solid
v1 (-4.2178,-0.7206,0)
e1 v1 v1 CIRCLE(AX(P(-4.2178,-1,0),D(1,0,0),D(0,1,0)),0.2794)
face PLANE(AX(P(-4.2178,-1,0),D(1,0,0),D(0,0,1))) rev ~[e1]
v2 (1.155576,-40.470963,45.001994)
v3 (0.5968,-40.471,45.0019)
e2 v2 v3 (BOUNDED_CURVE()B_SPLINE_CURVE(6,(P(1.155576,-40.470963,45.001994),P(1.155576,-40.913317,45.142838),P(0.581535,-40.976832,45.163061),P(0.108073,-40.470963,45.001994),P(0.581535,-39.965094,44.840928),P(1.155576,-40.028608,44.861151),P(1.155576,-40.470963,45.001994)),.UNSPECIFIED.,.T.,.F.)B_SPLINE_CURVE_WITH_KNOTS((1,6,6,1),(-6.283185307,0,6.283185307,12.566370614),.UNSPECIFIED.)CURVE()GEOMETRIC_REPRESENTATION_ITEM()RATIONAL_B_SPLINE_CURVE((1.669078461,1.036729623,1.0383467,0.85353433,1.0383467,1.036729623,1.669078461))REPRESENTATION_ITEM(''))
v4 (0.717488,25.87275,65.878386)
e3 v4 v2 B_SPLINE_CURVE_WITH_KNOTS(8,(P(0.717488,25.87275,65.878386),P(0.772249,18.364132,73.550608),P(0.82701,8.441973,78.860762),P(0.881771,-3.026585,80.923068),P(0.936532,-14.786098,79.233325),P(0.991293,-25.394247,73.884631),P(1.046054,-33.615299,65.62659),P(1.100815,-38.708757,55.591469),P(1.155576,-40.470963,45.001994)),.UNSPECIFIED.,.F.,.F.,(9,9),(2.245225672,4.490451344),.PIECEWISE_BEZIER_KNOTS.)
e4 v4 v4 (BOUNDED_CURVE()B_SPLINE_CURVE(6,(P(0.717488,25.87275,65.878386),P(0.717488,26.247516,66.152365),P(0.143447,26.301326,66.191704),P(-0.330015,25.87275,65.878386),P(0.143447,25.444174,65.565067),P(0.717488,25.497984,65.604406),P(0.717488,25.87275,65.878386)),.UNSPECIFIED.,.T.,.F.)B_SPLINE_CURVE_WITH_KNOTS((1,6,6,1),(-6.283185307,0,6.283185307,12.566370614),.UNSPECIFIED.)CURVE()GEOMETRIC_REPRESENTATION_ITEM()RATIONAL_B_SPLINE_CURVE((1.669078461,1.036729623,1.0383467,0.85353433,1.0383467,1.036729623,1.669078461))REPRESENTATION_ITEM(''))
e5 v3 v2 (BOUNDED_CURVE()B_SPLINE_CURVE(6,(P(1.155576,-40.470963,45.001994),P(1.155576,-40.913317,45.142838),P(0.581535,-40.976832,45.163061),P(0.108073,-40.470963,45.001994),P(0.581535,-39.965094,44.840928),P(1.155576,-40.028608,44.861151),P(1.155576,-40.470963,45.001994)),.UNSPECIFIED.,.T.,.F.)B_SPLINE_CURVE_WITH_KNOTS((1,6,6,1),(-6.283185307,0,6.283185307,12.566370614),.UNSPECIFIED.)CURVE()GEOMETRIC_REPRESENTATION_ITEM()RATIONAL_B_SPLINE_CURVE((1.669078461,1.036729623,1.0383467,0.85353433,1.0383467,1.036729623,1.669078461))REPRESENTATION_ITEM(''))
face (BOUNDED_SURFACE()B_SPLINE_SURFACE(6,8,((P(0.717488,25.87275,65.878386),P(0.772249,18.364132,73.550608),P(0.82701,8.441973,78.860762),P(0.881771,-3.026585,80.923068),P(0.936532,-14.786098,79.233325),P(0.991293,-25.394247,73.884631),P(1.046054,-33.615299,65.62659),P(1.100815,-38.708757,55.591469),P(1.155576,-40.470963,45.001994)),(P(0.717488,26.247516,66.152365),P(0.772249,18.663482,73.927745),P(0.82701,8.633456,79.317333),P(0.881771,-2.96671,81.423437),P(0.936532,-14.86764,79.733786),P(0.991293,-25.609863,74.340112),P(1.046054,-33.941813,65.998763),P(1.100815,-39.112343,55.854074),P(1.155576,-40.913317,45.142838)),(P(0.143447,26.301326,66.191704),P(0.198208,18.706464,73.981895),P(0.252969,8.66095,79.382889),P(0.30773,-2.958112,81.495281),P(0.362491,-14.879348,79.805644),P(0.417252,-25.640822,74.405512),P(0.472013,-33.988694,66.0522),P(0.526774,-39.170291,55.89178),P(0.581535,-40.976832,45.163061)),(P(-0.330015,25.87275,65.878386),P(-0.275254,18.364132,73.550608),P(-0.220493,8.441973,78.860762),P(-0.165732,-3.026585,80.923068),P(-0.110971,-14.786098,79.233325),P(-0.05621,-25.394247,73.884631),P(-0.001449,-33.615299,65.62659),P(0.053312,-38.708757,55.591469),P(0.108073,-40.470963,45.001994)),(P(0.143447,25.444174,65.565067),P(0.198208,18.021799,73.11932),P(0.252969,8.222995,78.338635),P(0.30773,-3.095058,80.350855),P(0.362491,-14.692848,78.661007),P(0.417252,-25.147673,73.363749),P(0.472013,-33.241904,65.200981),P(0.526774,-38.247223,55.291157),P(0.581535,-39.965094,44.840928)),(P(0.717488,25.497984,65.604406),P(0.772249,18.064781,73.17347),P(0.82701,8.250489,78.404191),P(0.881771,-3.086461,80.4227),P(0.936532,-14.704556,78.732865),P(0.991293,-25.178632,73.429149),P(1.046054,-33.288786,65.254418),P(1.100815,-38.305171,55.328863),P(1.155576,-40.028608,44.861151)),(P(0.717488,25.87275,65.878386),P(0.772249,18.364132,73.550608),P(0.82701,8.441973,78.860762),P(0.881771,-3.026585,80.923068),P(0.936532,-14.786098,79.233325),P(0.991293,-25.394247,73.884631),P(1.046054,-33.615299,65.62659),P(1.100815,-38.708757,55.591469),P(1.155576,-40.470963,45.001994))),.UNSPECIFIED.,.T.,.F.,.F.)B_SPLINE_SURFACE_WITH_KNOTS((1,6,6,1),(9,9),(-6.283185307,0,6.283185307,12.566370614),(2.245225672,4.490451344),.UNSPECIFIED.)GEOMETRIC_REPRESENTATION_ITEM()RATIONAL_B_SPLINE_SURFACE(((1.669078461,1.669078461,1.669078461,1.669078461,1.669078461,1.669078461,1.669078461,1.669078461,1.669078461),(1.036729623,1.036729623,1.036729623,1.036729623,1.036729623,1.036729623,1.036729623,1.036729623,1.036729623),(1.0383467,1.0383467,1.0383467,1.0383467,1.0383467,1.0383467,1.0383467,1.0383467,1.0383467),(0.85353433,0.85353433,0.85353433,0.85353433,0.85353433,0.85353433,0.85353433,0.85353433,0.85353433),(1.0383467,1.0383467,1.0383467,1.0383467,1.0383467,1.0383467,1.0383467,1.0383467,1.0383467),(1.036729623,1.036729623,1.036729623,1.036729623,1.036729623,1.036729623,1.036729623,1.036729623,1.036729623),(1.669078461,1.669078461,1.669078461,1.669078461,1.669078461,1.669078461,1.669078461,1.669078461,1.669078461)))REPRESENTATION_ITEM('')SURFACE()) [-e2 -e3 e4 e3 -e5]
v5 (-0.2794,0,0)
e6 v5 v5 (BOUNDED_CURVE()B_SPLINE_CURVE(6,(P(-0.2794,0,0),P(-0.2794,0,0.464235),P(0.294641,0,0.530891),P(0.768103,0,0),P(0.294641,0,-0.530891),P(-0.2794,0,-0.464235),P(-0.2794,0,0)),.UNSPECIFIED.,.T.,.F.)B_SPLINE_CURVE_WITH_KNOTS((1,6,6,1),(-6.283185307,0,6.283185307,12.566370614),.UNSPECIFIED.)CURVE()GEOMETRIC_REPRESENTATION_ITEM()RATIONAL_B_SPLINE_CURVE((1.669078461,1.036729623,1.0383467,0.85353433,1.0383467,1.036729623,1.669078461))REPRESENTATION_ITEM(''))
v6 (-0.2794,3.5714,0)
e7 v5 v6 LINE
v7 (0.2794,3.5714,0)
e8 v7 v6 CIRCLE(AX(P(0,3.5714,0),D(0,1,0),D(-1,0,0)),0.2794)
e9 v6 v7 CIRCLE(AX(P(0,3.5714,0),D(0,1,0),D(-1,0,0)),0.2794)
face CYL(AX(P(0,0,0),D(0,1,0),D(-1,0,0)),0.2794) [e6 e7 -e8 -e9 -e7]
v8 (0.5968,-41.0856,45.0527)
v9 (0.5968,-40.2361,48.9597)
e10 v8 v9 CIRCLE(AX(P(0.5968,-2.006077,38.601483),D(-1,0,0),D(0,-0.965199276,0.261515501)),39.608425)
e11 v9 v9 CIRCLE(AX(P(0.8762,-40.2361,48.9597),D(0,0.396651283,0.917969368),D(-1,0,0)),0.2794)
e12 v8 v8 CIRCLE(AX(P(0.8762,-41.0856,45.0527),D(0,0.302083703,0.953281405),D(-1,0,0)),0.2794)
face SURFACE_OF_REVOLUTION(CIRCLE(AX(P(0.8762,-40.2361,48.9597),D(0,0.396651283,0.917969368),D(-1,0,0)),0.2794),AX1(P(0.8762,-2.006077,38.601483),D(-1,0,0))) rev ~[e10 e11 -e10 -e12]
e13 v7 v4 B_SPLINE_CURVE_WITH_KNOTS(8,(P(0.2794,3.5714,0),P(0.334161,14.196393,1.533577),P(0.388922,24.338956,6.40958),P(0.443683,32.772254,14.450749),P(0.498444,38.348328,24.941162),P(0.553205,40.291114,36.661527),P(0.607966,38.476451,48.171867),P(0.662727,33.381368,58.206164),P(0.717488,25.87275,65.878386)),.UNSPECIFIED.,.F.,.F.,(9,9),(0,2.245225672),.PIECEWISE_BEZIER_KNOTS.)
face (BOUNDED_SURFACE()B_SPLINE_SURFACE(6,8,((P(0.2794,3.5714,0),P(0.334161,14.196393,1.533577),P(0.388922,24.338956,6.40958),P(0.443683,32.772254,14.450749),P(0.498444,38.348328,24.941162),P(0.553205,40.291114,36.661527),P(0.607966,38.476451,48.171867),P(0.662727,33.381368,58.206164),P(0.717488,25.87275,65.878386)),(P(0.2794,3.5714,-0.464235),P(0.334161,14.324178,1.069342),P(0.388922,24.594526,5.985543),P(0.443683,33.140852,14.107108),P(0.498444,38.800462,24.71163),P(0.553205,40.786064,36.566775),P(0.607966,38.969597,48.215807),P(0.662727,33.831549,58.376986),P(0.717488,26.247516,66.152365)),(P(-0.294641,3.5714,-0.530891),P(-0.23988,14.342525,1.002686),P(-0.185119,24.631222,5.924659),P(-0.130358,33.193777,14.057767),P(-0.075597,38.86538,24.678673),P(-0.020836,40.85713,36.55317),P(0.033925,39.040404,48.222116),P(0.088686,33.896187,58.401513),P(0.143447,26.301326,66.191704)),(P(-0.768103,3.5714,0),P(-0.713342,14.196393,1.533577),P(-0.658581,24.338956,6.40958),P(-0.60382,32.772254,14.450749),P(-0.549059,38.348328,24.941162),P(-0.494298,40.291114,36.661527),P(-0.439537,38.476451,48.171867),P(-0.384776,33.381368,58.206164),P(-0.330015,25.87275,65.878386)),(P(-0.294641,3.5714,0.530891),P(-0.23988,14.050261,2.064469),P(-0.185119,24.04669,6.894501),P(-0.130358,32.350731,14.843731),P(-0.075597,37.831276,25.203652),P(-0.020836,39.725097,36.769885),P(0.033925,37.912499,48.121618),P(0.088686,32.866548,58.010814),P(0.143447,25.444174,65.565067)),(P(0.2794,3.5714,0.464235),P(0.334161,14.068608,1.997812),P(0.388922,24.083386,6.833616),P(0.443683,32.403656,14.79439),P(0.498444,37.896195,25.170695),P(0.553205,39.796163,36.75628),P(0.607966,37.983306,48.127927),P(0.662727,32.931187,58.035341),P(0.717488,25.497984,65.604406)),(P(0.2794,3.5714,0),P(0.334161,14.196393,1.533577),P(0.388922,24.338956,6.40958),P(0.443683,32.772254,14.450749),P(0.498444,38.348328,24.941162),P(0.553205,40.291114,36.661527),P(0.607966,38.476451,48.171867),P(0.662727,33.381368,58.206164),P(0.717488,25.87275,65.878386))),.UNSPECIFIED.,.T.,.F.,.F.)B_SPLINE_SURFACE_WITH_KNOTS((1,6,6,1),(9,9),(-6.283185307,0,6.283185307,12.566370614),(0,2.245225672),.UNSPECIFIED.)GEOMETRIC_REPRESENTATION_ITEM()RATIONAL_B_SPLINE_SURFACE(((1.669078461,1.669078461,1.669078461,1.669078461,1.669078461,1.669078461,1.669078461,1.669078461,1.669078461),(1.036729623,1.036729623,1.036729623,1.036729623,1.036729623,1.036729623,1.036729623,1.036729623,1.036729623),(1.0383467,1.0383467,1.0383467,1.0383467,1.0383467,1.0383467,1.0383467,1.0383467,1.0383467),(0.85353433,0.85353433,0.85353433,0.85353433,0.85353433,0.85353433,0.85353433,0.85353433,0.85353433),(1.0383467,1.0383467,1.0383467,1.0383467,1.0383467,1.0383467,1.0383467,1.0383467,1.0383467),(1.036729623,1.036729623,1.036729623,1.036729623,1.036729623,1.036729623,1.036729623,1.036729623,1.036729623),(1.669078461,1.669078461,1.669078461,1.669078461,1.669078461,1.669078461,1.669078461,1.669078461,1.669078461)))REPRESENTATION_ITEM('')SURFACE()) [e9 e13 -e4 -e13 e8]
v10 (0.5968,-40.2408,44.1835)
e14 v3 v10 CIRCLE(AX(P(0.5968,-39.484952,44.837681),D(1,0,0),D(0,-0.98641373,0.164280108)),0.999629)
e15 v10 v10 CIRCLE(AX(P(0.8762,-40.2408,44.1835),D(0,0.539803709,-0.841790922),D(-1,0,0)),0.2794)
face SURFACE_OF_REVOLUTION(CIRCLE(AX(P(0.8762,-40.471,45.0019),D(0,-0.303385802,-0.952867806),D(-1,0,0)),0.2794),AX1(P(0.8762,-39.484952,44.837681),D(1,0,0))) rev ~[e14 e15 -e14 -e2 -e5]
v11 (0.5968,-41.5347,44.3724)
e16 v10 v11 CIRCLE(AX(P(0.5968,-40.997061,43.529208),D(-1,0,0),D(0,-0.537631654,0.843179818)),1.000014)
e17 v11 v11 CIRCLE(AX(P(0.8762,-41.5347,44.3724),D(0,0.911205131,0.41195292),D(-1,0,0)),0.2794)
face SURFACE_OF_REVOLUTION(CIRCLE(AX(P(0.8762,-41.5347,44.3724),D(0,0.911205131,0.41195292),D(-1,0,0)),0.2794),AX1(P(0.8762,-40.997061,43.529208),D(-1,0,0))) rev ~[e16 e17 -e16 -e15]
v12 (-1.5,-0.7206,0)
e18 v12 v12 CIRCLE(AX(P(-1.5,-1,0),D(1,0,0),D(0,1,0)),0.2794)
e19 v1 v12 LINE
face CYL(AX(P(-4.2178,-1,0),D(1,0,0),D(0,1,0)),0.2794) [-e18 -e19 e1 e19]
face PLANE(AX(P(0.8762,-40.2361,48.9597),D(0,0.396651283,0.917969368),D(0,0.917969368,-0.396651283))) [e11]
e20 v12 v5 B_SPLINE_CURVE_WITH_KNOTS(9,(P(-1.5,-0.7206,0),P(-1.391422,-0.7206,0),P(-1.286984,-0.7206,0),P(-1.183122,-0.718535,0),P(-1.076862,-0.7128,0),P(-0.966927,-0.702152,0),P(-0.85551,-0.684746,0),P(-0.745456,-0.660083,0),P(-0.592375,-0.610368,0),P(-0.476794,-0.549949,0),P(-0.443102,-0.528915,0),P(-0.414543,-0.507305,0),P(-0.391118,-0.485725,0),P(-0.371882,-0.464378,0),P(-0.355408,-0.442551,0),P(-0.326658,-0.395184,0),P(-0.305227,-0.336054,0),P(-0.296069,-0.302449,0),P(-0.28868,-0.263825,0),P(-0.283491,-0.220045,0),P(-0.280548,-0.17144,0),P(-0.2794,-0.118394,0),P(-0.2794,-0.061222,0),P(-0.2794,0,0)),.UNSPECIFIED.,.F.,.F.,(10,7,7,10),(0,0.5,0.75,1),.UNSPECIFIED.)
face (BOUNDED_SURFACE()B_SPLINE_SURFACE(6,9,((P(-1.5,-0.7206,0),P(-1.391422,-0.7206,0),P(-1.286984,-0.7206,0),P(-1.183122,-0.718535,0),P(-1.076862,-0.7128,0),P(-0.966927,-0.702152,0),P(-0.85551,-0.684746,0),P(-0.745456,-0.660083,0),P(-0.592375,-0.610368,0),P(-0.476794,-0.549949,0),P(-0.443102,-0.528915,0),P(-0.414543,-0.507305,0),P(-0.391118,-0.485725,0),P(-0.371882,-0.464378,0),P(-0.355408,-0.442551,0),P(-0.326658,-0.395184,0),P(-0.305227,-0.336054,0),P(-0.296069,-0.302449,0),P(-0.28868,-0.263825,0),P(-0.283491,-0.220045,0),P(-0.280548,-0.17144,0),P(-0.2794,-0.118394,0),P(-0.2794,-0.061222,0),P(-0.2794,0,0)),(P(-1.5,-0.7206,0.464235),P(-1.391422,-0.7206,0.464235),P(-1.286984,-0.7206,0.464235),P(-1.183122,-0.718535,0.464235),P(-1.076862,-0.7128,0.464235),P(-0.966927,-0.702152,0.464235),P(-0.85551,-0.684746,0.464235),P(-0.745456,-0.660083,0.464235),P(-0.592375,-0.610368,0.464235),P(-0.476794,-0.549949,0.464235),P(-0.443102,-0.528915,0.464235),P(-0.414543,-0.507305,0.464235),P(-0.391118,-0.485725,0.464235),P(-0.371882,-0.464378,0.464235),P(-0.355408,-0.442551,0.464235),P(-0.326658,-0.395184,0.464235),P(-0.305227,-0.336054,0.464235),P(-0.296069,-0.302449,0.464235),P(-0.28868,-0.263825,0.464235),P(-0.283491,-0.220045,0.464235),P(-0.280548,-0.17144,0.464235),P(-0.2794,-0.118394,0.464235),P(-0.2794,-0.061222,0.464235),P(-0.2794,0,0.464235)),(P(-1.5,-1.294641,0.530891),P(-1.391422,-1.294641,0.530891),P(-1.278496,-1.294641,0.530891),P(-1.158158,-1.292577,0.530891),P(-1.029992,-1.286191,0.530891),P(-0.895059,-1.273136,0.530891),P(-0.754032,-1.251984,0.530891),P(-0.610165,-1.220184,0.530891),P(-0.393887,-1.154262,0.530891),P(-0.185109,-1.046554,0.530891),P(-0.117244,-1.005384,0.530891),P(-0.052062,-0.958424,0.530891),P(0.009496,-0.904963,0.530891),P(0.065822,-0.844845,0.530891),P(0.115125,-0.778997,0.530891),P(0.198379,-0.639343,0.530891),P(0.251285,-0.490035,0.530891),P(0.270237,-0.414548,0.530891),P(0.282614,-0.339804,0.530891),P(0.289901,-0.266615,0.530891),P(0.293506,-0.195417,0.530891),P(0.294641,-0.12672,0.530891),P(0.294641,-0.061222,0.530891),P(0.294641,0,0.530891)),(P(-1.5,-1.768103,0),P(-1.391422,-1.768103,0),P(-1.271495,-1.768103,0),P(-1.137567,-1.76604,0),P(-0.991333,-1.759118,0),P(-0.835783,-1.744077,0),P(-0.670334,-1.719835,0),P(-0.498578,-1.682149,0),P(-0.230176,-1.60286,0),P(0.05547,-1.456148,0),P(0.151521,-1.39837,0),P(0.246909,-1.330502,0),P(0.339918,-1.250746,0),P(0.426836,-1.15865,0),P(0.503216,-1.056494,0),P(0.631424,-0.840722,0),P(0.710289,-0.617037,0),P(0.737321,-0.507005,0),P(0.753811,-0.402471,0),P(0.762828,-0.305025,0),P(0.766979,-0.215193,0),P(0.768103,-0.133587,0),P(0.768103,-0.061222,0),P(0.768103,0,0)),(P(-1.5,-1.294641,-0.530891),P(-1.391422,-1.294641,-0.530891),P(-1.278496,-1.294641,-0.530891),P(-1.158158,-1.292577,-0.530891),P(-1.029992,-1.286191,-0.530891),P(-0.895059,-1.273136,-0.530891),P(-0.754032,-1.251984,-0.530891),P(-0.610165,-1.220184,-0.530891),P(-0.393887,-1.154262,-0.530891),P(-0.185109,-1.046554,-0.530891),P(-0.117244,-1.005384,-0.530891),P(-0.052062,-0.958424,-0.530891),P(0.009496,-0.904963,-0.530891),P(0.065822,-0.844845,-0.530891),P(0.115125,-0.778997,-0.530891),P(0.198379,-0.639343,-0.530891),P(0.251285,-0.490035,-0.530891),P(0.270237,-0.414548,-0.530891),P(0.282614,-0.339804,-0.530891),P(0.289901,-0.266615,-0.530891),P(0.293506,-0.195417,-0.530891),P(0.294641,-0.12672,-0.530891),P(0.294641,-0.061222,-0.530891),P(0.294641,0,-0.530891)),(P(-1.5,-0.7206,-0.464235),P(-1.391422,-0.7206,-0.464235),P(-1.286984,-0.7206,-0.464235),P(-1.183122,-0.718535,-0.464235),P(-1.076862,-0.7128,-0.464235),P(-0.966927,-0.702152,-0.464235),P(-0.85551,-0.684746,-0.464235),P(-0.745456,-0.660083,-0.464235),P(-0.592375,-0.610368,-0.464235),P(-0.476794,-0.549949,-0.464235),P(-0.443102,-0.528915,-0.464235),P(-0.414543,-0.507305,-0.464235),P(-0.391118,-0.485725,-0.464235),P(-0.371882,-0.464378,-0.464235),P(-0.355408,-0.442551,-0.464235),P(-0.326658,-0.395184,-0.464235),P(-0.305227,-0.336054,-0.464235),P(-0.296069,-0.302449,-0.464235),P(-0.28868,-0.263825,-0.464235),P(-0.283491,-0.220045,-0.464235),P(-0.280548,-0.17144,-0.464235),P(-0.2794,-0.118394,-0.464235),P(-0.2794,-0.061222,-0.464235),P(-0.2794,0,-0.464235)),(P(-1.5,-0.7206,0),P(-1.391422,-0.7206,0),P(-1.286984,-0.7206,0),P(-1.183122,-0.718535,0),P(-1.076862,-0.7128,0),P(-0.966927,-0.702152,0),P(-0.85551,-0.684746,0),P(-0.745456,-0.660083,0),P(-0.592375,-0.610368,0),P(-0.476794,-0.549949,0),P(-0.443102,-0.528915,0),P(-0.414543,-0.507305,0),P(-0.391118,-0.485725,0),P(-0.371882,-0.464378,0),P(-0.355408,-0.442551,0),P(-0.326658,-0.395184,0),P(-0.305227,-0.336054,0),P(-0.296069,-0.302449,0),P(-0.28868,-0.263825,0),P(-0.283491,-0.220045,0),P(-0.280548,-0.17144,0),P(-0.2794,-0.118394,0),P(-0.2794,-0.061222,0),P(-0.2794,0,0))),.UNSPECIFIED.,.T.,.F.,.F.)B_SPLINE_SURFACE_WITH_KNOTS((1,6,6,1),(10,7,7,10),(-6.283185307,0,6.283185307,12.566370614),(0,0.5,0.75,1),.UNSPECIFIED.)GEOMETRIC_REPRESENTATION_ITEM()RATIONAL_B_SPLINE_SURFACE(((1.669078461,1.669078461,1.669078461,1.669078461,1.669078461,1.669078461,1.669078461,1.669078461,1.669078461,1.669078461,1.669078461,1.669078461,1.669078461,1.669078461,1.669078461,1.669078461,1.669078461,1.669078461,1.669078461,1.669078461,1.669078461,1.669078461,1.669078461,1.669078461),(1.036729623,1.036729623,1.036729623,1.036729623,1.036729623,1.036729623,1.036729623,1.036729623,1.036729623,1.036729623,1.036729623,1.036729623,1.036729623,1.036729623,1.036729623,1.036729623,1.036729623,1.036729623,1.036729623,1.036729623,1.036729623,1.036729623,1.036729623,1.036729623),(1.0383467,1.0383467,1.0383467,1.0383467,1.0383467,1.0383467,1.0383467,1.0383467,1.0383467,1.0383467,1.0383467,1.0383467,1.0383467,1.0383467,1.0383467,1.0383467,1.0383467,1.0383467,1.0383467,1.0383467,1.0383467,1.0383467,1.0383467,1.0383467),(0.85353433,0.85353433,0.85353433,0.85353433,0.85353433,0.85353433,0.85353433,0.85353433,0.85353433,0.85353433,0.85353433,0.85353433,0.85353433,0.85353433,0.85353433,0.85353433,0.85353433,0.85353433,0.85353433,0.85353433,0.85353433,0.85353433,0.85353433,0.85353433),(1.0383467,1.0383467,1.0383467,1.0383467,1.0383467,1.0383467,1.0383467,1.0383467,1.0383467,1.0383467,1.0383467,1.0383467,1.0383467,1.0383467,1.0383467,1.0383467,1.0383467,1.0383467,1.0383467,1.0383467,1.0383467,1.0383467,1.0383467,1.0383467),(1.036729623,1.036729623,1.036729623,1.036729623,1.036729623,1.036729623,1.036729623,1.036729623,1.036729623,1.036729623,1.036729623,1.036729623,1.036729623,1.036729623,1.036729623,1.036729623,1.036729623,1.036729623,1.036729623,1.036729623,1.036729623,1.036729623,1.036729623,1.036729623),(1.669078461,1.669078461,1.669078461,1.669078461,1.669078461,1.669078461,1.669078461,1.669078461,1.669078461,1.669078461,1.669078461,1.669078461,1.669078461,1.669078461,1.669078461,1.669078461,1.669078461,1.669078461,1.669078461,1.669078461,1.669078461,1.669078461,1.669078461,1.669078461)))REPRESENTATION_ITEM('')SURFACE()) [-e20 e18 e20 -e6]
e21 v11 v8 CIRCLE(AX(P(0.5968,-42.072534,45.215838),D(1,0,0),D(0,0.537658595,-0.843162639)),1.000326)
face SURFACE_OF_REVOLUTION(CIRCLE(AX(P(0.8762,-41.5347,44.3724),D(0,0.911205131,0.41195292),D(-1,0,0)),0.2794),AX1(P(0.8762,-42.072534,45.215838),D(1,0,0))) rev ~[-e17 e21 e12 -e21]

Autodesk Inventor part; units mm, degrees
ref_plane "XY Plane" through (0, 0, 0) normal (0, 0, 1) x (1, 0, 0)
sketch "Sketch3" plane through (0, 0, 0) normal (0, 1, 0) x (-1, 0, 0)
  circle A0 centre (0, 0) radius 0.2794
  dimension "d7" = 0.5588
sketch "Sketch4" plane through (0, 0, 0) normal (0, 0, 1) x (1, 0, 0)
  line L0 (-4.2178, -1) -> (-1.5, -1)
  line L1 (0, 0) -> (0, 3.5714)
  spline S0 degree 4 poles (-1.5, -1) (-1.2557, -1) (-0.7672, -1) (0, -0.8266) (0, -0.2755) (0, 0) knots 0 0 0 0 0 0.5 1 1 1 1 1
  circle A0 centre (-38.6, -2) radius 39 construction
  dimension "d18" = 78
  dimension "d8" = 1
  dimension "d9" = 1.5
  dimension "d10" = 2.7178
  dimension "d11" = 3.5714
  dimension "d19" = 1
  dimension "d20" = 38.6
ref_plane "Work Plane1" through (-38.6, -2, 0) normal (0, 1, 0) x (-1, 0, 0)
sketch "Sketch6" plane through (0.4, -2, 0) normal (0, 1, 0) x (-1, 0, 0)
  line L0 (-2.3178, 38.6) -> (0.4, 38.6)
  point P0 (0.4, 0)
  dimension "d21" = 38.6
  dimension "d22" = 2.7178
sweep "Sweep3" add profiles "Sketch3" path "Sketch4"
sketch "Sketch7" plane through (0, 3.5714, 0) normal (0, 1, 0) x (1, 0, 0)
  circle A0 centre (0, 0) radius 0.2794 projected
  point P0 (0, 0)
coil "Coil1" sketch "Sketch7" operation add axis through (2.7178, -2, 38.6) along (1, 0, 0) pitch 1.25 turns 0.700941 hand right
sketch "Sketch8" plane through (0.8762, -40.471, 45.0019) normal (0, -0.3033858, -0.9528678) x (-1, 0, 0)
  circle A0 centre (0, 0) radius 0.2794 projected
  point P0 (0.8762, 52.2164)
  point P1 (-0.2794, 0)
ref_plane "Work Plane2" through (0.8762, -40.471, 45.0019) normal (1, 0, 0) x (0, 1, 0)
sketch "Sketch9" plane through (0.8762, -40.471, 45.0019) normal (1, 0, 0) x (0, 1, 0)
  arc A0 (0, 0) -> (0.2302, -0.8184) centre (0.9864, -0.1642) ccw
  arc A1 (-1.0637, -0.6295) -> (0.2302, -0.8184) centre (-0.5261, -1.4727) ccw
  arc A2 (-1.0637, -0.6295) -> (-0.6146, 0.0508) centre (-1.6013, 0.2137) ccw
  arc A3 (0.2349, 3.9578) -> (-0.6146, 0.0508) centre (38.471, -6.4019) ccw
  circle A4 centre (38.471, -6.4019) radius 39 construction
  circle A5 centre (38.471, -6.4019) radius 39.3073 construction
  point P0 (40.471, -45.0019)
  dimension "d34" = 0.3073
  dimension "d33" = 1
  dimension "d35" = 0.3073
  dimension "d36" = 4
sweep "Sweep4" add profiles "Sketch8" path "Sketch9"
equation "\"d21\" = d20"
equation "\"d22\" = d10"
equation "\"d34\" = 0.55 * d7"
equation "\"d35\" = d34"
properties part number "+XPanel_AntennaStowed+Y" material "Titanium"
